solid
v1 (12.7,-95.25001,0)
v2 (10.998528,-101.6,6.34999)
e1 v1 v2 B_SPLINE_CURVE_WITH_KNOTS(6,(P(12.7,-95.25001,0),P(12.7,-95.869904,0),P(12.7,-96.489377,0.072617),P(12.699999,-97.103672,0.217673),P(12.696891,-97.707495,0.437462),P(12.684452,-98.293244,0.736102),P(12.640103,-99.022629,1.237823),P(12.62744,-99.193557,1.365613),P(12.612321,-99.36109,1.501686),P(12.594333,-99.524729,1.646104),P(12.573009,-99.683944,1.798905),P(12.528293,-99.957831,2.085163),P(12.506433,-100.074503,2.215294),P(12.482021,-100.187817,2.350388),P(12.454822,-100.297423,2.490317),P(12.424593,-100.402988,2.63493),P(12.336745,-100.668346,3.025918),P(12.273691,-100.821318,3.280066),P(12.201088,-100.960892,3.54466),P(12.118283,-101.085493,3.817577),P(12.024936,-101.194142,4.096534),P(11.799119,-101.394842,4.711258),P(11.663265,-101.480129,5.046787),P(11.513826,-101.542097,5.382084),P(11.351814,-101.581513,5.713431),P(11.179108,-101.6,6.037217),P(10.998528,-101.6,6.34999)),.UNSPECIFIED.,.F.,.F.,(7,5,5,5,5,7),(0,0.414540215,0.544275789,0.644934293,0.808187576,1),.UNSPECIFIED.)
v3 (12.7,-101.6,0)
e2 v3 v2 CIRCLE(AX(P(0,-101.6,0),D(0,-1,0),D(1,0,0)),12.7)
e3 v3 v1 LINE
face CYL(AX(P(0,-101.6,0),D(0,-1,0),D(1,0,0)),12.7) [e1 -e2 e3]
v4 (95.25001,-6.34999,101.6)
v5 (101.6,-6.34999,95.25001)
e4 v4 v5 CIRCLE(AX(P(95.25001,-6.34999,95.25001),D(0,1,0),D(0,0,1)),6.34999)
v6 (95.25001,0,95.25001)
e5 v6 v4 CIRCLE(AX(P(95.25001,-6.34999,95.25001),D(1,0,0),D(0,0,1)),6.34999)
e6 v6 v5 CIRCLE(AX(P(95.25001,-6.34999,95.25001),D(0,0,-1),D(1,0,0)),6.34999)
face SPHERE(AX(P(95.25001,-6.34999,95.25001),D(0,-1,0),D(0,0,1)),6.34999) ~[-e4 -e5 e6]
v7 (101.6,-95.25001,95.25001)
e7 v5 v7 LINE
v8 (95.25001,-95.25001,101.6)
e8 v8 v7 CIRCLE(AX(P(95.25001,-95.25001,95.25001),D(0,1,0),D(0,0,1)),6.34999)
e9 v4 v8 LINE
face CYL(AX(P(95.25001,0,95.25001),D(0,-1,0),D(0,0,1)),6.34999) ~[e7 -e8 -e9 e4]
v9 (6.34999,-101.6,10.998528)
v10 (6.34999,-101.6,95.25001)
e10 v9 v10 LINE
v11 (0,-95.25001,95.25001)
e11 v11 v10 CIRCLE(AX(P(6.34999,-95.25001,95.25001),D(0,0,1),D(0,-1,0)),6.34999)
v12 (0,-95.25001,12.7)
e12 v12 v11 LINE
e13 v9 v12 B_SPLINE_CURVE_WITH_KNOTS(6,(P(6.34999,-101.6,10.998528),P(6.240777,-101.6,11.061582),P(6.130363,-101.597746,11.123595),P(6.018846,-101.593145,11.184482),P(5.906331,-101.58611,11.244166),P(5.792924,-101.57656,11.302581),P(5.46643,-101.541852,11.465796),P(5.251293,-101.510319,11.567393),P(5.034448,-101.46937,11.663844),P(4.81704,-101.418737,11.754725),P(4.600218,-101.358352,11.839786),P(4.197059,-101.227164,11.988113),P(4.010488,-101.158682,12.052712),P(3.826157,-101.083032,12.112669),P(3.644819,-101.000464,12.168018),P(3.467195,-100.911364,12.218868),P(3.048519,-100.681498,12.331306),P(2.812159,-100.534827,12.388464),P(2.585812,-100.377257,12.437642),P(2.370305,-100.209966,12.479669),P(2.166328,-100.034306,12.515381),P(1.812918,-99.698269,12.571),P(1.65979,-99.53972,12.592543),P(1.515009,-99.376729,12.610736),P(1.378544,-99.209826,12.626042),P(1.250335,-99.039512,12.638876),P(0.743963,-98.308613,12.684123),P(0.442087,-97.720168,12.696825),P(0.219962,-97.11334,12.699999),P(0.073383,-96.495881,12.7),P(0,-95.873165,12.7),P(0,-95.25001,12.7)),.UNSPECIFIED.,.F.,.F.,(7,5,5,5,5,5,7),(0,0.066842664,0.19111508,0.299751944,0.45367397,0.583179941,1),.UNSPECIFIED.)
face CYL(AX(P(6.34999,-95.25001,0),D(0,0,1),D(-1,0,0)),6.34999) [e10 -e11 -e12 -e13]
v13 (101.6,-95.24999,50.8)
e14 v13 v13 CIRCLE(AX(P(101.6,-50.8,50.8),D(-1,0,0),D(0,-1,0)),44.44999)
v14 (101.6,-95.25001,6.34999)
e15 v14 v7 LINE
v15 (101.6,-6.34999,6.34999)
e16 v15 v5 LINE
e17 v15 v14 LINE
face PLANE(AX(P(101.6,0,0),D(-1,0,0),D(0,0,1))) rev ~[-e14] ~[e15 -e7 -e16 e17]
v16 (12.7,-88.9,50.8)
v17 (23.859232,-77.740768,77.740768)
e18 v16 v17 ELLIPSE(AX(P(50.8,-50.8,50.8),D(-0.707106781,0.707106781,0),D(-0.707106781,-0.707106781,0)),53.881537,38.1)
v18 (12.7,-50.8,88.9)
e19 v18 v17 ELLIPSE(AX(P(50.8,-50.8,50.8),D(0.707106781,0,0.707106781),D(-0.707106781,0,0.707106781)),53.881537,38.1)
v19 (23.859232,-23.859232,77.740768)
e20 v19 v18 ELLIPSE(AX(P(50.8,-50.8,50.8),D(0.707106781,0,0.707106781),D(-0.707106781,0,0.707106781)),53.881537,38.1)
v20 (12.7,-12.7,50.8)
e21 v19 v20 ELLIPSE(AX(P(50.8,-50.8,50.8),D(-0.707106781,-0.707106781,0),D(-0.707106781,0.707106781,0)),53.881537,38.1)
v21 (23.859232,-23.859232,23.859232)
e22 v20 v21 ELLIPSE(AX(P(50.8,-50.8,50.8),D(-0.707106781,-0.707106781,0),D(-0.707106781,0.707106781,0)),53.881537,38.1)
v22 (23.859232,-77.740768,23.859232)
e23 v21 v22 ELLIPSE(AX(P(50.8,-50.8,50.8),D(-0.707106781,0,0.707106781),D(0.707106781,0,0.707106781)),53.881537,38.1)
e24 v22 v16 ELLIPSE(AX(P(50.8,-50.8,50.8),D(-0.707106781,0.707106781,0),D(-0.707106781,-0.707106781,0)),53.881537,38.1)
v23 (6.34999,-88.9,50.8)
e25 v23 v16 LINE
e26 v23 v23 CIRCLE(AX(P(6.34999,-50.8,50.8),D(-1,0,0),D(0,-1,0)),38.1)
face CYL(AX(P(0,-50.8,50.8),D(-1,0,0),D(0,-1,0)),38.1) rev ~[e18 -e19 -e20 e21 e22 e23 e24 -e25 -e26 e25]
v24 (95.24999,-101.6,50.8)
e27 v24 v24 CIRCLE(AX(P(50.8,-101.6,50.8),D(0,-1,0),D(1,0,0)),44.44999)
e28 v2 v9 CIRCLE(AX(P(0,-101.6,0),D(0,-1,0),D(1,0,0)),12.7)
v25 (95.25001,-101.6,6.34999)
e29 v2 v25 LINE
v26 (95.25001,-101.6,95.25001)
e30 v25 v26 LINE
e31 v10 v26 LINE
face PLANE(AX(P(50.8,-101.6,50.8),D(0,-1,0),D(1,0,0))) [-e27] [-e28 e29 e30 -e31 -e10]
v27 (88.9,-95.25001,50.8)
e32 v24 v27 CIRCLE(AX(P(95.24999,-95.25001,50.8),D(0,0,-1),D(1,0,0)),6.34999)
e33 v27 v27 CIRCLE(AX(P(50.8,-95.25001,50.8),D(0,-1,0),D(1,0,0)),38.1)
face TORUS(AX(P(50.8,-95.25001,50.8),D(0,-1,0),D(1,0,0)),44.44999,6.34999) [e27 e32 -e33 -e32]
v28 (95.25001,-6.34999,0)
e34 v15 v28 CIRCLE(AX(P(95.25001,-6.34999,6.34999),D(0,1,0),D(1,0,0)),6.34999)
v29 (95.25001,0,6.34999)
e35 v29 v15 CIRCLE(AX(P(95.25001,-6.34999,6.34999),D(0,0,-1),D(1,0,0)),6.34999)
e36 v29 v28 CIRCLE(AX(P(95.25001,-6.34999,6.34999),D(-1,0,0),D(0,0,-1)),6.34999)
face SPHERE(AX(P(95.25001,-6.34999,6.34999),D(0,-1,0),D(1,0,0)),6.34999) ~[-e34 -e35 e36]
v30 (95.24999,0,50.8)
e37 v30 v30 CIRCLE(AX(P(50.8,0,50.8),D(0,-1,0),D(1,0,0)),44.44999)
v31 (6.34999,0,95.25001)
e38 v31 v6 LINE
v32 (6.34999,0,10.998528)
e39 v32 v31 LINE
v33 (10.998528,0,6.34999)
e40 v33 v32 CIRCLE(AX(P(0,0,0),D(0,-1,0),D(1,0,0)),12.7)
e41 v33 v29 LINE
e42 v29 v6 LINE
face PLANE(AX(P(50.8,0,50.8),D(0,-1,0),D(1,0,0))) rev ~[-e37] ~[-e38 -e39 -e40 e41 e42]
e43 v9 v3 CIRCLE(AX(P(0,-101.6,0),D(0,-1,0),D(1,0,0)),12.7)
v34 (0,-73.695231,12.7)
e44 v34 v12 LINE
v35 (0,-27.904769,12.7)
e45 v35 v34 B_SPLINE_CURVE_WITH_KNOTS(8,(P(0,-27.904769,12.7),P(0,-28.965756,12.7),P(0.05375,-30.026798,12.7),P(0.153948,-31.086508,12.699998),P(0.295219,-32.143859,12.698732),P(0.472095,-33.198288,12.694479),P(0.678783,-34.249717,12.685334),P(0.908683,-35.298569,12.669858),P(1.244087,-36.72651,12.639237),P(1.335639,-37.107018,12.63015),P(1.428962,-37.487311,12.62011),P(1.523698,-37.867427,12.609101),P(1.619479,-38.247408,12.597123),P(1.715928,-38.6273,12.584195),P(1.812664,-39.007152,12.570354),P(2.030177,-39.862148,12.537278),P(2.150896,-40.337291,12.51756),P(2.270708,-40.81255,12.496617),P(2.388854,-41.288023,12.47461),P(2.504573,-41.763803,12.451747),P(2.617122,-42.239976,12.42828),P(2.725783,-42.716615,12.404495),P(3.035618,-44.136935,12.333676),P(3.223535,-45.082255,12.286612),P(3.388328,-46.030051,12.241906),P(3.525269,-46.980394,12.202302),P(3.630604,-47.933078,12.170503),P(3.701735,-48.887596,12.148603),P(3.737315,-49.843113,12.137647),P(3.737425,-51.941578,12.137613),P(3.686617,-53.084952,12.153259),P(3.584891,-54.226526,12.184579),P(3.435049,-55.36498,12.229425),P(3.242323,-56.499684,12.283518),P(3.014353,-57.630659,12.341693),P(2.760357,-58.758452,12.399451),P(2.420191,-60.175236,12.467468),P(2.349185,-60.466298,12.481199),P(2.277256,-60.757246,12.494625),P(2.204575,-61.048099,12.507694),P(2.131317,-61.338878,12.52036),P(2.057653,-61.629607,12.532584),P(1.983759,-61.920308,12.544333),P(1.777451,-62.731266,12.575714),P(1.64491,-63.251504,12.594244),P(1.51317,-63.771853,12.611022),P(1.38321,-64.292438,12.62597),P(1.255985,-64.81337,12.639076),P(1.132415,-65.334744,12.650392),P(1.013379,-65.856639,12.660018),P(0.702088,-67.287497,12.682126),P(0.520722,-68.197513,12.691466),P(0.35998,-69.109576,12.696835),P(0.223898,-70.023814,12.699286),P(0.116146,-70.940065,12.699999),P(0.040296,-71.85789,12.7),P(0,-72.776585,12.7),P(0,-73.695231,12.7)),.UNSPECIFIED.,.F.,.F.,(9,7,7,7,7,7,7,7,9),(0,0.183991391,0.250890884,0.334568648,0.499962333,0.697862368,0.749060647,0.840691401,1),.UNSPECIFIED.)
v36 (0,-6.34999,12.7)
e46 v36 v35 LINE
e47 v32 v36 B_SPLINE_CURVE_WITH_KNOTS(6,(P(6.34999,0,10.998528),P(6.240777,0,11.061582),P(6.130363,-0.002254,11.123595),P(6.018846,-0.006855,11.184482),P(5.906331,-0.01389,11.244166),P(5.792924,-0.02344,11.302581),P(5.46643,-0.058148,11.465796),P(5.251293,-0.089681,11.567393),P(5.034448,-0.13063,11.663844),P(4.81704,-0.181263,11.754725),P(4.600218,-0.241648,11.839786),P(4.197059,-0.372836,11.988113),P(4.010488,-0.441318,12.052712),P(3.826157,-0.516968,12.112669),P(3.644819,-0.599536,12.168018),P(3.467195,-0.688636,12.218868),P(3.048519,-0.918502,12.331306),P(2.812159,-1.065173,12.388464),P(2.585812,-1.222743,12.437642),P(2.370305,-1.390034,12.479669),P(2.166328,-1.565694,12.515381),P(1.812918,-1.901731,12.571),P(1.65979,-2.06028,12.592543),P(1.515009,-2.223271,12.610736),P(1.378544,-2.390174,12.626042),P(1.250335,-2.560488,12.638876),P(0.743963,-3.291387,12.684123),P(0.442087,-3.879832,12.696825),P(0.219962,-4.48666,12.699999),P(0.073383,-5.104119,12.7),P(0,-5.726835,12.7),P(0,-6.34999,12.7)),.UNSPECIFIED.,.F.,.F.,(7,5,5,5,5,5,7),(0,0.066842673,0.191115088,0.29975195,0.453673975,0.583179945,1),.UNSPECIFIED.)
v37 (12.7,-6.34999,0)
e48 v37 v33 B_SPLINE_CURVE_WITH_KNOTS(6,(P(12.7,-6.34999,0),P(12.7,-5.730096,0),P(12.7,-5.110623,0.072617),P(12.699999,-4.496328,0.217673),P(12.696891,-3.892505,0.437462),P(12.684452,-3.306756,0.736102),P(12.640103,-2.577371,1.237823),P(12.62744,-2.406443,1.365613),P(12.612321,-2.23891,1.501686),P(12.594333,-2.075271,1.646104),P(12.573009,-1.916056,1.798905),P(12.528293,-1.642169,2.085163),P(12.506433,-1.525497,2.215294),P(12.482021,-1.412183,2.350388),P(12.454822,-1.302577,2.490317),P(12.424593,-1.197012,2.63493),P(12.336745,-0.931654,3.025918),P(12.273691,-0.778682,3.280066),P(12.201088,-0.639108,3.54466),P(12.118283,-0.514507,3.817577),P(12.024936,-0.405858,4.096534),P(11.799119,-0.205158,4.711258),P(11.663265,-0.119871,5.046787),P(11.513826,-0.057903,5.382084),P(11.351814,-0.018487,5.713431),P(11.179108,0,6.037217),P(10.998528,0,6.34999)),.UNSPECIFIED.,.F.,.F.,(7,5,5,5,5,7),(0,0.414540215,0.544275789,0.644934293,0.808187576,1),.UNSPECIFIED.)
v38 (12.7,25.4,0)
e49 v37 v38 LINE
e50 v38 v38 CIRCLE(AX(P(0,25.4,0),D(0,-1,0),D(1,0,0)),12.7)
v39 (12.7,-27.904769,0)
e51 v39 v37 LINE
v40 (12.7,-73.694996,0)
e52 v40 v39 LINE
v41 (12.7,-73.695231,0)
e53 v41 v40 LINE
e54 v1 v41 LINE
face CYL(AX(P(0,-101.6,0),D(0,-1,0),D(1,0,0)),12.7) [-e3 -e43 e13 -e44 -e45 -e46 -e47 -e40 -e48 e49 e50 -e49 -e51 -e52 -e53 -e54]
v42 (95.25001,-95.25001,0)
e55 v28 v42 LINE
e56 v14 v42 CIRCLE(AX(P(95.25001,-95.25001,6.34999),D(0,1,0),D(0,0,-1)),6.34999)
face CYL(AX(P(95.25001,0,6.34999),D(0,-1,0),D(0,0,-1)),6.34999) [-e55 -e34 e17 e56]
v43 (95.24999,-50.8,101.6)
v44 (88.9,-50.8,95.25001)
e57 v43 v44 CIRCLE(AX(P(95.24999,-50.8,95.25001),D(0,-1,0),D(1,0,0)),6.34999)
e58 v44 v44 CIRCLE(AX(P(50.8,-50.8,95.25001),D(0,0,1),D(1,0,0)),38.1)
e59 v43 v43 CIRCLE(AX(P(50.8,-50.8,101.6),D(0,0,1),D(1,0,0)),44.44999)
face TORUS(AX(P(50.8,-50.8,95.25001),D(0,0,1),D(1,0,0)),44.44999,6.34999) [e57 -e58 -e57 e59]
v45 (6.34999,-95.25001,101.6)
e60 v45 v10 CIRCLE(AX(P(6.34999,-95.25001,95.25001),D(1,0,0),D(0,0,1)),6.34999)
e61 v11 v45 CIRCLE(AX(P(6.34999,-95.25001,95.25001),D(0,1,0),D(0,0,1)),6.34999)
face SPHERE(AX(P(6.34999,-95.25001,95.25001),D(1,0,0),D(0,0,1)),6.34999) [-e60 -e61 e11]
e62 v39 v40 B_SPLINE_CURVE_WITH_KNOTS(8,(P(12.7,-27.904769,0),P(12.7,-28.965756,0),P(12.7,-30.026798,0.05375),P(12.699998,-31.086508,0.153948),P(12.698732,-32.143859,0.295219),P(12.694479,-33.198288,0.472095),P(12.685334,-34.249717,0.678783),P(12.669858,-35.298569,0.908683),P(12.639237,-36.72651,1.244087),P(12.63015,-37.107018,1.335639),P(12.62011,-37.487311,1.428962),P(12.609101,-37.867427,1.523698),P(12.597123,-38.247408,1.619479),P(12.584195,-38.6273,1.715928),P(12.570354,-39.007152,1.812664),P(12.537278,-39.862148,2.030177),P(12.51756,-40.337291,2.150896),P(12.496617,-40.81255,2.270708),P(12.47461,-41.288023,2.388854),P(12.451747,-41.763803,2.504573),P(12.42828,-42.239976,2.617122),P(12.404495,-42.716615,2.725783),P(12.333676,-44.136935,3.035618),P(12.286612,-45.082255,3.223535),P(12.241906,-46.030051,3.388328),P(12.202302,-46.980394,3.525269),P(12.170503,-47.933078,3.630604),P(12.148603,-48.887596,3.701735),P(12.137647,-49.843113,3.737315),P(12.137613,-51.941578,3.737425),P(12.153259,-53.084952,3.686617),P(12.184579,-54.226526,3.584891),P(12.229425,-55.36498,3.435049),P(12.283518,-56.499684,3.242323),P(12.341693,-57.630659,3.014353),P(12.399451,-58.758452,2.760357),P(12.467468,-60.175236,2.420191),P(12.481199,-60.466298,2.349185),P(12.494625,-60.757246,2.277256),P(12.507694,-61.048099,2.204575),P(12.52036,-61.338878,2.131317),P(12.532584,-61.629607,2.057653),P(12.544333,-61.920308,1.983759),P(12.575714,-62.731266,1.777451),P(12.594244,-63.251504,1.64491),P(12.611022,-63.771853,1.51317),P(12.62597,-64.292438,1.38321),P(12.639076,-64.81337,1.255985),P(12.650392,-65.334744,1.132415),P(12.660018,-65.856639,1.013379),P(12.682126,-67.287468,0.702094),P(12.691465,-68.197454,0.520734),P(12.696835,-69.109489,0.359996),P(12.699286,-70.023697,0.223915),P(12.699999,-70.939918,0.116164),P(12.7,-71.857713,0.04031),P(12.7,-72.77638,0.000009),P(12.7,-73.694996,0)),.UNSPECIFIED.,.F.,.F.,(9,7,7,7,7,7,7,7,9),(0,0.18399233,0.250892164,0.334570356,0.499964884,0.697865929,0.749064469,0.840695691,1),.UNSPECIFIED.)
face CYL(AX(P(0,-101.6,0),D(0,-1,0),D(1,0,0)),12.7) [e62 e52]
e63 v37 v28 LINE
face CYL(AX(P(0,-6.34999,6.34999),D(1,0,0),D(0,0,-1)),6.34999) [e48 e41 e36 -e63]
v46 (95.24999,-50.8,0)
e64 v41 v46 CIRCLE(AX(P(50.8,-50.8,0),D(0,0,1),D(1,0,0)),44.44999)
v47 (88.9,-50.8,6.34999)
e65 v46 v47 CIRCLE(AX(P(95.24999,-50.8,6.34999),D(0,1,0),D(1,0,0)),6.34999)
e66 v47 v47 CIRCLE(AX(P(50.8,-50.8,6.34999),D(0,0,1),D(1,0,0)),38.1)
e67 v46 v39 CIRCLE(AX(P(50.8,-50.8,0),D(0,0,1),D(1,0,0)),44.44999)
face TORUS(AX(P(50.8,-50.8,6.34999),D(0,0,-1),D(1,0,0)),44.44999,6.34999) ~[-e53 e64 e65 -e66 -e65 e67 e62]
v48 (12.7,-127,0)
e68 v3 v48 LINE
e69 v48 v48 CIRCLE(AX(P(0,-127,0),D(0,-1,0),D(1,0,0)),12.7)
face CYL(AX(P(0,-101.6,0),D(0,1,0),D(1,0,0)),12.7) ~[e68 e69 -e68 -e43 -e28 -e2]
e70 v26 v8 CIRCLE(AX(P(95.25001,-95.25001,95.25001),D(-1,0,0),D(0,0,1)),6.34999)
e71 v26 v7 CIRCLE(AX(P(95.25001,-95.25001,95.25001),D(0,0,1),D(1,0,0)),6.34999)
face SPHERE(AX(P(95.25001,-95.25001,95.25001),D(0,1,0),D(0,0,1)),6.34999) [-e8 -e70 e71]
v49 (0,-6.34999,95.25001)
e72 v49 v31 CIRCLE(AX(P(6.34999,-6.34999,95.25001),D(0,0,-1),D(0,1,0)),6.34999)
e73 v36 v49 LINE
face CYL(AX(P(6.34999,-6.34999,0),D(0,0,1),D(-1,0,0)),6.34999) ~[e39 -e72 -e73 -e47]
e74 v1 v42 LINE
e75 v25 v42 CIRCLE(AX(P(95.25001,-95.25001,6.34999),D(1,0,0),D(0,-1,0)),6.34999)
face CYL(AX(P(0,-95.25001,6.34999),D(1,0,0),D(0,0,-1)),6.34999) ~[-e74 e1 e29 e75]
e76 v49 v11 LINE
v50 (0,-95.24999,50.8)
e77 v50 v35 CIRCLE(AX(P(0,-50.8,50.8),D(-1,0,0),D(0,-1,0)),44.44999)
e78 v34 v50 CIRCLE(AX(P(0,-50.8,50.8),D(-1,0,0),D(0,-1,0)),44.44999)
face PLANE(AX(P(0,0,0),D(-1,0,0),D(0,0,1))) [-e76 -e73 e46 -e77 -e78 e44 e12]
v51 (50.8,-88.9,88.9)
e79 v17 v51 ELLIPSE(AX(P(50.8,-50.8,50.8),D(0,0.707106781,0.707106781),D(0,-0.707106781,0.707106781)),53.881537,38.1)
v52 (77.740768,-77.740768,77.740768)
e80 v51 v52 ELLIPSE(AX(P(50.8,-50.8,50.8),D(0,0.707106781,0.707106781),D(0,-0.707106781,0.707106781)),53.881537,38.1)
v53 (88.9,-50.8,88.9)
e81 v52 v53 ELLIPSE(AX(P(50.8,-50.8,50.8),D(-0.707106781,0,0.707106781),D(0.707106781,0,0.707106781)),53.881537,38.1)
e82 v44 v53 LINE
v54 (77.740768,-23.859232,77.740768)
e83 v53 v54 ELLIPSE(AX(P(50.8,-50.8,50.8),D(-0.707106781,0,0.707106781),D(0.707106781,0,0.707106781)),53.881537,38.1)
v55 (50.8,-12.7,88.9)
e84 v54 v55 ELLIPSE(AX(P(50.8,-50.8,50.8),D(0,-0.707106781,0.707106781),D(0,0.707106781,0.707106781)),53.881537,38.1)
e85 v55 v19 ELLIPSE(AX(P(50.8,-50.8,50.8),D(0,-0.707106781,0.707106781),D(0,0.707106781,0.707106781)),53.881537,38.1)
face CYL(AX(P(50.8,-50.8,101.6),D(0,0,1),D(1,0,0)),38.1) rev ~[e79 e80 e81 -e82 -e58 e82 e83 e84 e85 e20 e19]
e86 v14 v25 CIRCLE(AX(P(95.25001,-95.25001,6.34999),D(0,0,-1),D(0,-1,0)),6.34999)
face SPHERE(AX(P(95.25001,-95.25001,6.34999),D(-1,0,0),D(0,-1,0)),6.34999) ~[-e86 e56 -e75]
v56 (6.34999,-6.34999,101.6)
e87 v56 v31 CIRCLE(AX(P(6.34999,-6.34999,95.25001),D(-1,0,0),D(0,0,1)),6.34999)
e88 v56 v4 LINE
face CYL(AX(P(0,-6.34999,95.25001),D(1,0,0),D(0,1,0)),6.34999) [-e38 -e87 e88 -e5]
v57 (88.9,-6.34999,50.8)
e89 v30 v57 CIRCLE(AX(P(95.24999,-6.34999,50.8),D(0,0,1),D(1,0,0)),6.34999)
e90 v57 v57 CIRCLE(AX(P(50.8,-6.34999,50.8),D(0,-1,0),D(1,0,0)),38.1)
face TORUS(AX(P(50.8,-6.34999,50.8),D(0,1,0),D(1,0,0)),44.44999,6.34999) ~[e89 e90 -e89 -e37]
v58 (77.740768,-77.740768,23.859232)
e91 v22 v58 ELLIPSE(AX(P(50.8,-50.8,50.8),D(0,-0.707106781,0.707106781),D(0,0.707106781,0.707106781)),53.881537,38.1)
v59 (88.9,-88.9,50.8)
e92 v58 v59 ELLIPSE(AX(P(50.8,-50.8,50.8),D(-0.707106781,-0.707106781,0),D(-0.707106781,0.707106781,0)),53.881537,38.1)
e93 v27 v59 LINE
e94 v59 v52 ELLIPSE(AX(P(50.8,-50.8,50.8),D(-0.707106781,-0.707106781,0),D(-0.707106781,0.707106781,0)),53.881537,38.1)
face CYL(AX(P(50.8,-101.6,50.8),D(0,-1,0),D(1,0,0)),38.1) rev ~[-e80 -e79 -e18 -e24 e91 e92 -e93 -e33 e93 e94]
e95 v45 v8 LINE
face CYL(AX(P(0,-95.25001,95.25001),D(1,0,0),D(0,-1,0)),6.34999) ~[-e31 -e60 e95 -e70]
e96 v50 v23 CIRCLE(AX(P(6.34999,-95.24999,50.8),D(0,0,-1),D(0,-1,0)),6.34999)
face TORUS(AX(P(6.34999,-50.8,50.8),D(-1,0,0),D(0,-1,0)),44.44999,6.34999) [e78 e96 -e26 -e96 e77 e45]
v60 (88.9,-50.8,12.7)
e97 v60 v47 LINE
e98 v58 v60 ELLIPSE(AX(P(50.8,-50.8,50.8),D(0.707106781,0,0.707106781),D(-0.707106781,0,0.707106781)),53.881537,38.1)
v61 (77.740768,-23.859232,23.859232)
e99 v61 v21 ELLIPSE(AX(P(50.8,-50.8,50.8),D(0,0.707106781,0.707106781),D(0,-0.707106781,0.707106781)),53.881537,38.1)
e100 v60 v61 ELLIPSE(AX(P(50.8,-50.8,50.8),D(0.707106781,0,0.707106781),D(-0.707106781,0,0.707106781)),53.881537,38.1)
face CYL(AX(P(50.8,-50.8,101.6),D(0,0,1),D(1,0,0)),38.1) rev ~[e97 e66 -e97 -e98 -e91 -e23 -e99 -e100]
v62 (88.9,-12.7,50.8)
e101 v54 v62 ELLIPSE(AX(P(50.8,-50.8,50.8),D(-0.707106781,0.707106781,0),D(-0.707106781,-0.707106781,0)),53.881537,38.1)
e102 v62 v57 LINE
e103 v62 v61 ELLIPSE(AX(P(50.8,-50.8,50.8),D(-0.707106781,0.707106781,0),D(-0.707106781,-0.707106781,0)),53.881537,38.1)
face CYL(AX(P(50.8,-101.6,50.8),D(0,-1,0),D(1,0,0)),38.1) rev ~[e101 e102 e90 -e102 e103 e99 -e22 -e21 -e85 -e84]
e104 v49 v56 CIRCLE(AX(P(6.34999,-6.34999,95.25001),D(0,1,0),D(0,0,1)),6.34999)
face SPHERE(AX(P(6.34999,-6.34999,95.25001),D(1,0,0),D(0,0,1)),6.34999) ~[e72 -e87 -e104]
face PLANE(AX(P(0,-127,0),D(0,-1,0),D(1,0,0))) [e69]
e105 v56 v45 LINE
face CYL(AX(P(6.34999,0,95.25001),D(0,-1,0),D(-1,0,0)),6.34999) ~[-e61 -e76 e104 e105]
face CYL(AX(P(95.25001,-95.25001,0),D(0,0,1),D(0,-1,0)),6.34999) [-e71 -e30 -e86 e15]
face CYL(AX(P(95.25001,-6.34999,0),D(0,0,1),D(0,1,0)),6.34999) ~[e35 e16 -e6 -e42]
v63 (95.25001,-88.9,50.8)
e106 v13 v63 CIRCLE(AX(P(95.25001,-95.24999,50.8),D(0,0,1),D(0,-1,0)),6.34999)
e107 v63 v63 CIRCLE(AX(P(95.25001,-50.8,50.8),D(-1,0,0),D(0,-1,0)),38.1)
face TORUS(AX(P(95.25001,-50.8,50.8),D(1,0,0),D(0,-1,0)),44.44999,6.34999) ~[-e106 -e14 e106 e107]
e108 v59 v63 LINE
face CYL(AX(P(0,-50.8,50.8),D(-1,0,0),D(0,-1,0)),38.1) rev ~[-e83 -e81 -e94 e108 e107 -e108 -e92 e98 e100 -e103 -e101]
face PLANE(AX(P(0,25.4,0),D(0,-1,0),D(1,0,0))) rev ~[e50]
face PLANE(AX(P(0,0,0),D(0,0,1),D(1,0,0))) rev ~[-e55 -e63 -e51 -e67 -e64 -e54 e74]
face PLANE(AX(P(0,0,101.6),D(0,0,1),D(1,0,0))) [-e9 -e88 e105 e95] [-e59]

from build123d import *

# Parameters (mm, degrees)
F0_W           = 101.6
F0_H           = 101.6
F1_DEPTH       = 101.6
F2_R           = 38.1
F3_DEPTH       = 101.6
F4_R           = 38.1
F5_DEPTH       = 101.6
F6_R           = 38.1
F7_DEPTH       = 101.6
F8_R           = 6.34999
F10_R          = 12.7
F11_DEPTH      = 25.4
F11_DEPTH_BACK = 127


# Not quite as in the source:
# - a fillet or chamfer is up to 0.001 mm smaller than in the source, because OpenCascade refuses the exact size


with BuildPart() as f1:
    # F0 (on Front) → F1 (new body)
    with BuildSketch(Plane.XZ):
        with Locations((50.8, 50.8)):
            Rectangle(F0_W, F0_H)
    extrude(amount=F1_DEPTH)

    # F2 (on face) → F3 (cut)
    with BuildSketch(Plane.XY.offset(101.6)):
        with Locations((50.8, -50.8)):
            Circle(F2_R)
    extrude(amount=-F3_DEPTH, mode=Mode.SUBTRACT)

    # F4 (on face) → F5 (cut)
    with BuildSketch(Plane(origin=(0, 0, 0), x_dir=(0, -1, 0), z_dir=(-1, 0, 0))):
        with Locations((50.8, 50.8)):
            Circle(F4_R)
    extrude(amount=-F5_DEPTH, mode=Mode.SUBTRACT)

    # F6 (on face) → F7 (cut)
    with BuildSketch(Plane.XZ.offset(101.6)):
        with Locations((50.8, 50.8)):
            Circle(F6_R)
    extrude(amount=-F7_DEPTH, mode=Mode.SUBTRACT)

    # F8 (radius 6.35 in the source; OpenCascade refuses exactly that, so slightly less here)
    f8_edges = [f1.edges().sort_by_distance(p)[0] for p in [
        (101.6, -50.8, 101.6),
        (50.8, 0, 101.6),
        (50.8, -101.6, 101.6),
        (0, -50.8, 101.6),
        (12.7, -50.8, 101.6),
        (0, -101.6, 50.8),
        (50.8, -101.6, 0),
        (101.6, -101.6, 50.8),
        (12.7, -101.6, 50.8),
        (101.6, -50.8, 0),
        (101.6, 0, 50.8),
        (101.6, -12.7, 50.8),
        (0, 0, 50.8),
        (50.8, 0, 0),
        (12.7, 0, 50.8),
        (0, -50.8, 0),
        (0, -12.7, 50.8),
        (12.7, -50.8, 0),
    ]]
    fillet(f8_edges, radius=F8_R)

    # F10 (on offset) → F11 (join, two sides)
    with BuildSketch(Plane.XZ.offset(101.6)) as f11_sk:
        Circle(F10_R)
    extrude(amount=F11_DEPTH)
    extrude(f11_sk.sketch, amount=-F11_DEPTH_BACK)


solid = f1.part
